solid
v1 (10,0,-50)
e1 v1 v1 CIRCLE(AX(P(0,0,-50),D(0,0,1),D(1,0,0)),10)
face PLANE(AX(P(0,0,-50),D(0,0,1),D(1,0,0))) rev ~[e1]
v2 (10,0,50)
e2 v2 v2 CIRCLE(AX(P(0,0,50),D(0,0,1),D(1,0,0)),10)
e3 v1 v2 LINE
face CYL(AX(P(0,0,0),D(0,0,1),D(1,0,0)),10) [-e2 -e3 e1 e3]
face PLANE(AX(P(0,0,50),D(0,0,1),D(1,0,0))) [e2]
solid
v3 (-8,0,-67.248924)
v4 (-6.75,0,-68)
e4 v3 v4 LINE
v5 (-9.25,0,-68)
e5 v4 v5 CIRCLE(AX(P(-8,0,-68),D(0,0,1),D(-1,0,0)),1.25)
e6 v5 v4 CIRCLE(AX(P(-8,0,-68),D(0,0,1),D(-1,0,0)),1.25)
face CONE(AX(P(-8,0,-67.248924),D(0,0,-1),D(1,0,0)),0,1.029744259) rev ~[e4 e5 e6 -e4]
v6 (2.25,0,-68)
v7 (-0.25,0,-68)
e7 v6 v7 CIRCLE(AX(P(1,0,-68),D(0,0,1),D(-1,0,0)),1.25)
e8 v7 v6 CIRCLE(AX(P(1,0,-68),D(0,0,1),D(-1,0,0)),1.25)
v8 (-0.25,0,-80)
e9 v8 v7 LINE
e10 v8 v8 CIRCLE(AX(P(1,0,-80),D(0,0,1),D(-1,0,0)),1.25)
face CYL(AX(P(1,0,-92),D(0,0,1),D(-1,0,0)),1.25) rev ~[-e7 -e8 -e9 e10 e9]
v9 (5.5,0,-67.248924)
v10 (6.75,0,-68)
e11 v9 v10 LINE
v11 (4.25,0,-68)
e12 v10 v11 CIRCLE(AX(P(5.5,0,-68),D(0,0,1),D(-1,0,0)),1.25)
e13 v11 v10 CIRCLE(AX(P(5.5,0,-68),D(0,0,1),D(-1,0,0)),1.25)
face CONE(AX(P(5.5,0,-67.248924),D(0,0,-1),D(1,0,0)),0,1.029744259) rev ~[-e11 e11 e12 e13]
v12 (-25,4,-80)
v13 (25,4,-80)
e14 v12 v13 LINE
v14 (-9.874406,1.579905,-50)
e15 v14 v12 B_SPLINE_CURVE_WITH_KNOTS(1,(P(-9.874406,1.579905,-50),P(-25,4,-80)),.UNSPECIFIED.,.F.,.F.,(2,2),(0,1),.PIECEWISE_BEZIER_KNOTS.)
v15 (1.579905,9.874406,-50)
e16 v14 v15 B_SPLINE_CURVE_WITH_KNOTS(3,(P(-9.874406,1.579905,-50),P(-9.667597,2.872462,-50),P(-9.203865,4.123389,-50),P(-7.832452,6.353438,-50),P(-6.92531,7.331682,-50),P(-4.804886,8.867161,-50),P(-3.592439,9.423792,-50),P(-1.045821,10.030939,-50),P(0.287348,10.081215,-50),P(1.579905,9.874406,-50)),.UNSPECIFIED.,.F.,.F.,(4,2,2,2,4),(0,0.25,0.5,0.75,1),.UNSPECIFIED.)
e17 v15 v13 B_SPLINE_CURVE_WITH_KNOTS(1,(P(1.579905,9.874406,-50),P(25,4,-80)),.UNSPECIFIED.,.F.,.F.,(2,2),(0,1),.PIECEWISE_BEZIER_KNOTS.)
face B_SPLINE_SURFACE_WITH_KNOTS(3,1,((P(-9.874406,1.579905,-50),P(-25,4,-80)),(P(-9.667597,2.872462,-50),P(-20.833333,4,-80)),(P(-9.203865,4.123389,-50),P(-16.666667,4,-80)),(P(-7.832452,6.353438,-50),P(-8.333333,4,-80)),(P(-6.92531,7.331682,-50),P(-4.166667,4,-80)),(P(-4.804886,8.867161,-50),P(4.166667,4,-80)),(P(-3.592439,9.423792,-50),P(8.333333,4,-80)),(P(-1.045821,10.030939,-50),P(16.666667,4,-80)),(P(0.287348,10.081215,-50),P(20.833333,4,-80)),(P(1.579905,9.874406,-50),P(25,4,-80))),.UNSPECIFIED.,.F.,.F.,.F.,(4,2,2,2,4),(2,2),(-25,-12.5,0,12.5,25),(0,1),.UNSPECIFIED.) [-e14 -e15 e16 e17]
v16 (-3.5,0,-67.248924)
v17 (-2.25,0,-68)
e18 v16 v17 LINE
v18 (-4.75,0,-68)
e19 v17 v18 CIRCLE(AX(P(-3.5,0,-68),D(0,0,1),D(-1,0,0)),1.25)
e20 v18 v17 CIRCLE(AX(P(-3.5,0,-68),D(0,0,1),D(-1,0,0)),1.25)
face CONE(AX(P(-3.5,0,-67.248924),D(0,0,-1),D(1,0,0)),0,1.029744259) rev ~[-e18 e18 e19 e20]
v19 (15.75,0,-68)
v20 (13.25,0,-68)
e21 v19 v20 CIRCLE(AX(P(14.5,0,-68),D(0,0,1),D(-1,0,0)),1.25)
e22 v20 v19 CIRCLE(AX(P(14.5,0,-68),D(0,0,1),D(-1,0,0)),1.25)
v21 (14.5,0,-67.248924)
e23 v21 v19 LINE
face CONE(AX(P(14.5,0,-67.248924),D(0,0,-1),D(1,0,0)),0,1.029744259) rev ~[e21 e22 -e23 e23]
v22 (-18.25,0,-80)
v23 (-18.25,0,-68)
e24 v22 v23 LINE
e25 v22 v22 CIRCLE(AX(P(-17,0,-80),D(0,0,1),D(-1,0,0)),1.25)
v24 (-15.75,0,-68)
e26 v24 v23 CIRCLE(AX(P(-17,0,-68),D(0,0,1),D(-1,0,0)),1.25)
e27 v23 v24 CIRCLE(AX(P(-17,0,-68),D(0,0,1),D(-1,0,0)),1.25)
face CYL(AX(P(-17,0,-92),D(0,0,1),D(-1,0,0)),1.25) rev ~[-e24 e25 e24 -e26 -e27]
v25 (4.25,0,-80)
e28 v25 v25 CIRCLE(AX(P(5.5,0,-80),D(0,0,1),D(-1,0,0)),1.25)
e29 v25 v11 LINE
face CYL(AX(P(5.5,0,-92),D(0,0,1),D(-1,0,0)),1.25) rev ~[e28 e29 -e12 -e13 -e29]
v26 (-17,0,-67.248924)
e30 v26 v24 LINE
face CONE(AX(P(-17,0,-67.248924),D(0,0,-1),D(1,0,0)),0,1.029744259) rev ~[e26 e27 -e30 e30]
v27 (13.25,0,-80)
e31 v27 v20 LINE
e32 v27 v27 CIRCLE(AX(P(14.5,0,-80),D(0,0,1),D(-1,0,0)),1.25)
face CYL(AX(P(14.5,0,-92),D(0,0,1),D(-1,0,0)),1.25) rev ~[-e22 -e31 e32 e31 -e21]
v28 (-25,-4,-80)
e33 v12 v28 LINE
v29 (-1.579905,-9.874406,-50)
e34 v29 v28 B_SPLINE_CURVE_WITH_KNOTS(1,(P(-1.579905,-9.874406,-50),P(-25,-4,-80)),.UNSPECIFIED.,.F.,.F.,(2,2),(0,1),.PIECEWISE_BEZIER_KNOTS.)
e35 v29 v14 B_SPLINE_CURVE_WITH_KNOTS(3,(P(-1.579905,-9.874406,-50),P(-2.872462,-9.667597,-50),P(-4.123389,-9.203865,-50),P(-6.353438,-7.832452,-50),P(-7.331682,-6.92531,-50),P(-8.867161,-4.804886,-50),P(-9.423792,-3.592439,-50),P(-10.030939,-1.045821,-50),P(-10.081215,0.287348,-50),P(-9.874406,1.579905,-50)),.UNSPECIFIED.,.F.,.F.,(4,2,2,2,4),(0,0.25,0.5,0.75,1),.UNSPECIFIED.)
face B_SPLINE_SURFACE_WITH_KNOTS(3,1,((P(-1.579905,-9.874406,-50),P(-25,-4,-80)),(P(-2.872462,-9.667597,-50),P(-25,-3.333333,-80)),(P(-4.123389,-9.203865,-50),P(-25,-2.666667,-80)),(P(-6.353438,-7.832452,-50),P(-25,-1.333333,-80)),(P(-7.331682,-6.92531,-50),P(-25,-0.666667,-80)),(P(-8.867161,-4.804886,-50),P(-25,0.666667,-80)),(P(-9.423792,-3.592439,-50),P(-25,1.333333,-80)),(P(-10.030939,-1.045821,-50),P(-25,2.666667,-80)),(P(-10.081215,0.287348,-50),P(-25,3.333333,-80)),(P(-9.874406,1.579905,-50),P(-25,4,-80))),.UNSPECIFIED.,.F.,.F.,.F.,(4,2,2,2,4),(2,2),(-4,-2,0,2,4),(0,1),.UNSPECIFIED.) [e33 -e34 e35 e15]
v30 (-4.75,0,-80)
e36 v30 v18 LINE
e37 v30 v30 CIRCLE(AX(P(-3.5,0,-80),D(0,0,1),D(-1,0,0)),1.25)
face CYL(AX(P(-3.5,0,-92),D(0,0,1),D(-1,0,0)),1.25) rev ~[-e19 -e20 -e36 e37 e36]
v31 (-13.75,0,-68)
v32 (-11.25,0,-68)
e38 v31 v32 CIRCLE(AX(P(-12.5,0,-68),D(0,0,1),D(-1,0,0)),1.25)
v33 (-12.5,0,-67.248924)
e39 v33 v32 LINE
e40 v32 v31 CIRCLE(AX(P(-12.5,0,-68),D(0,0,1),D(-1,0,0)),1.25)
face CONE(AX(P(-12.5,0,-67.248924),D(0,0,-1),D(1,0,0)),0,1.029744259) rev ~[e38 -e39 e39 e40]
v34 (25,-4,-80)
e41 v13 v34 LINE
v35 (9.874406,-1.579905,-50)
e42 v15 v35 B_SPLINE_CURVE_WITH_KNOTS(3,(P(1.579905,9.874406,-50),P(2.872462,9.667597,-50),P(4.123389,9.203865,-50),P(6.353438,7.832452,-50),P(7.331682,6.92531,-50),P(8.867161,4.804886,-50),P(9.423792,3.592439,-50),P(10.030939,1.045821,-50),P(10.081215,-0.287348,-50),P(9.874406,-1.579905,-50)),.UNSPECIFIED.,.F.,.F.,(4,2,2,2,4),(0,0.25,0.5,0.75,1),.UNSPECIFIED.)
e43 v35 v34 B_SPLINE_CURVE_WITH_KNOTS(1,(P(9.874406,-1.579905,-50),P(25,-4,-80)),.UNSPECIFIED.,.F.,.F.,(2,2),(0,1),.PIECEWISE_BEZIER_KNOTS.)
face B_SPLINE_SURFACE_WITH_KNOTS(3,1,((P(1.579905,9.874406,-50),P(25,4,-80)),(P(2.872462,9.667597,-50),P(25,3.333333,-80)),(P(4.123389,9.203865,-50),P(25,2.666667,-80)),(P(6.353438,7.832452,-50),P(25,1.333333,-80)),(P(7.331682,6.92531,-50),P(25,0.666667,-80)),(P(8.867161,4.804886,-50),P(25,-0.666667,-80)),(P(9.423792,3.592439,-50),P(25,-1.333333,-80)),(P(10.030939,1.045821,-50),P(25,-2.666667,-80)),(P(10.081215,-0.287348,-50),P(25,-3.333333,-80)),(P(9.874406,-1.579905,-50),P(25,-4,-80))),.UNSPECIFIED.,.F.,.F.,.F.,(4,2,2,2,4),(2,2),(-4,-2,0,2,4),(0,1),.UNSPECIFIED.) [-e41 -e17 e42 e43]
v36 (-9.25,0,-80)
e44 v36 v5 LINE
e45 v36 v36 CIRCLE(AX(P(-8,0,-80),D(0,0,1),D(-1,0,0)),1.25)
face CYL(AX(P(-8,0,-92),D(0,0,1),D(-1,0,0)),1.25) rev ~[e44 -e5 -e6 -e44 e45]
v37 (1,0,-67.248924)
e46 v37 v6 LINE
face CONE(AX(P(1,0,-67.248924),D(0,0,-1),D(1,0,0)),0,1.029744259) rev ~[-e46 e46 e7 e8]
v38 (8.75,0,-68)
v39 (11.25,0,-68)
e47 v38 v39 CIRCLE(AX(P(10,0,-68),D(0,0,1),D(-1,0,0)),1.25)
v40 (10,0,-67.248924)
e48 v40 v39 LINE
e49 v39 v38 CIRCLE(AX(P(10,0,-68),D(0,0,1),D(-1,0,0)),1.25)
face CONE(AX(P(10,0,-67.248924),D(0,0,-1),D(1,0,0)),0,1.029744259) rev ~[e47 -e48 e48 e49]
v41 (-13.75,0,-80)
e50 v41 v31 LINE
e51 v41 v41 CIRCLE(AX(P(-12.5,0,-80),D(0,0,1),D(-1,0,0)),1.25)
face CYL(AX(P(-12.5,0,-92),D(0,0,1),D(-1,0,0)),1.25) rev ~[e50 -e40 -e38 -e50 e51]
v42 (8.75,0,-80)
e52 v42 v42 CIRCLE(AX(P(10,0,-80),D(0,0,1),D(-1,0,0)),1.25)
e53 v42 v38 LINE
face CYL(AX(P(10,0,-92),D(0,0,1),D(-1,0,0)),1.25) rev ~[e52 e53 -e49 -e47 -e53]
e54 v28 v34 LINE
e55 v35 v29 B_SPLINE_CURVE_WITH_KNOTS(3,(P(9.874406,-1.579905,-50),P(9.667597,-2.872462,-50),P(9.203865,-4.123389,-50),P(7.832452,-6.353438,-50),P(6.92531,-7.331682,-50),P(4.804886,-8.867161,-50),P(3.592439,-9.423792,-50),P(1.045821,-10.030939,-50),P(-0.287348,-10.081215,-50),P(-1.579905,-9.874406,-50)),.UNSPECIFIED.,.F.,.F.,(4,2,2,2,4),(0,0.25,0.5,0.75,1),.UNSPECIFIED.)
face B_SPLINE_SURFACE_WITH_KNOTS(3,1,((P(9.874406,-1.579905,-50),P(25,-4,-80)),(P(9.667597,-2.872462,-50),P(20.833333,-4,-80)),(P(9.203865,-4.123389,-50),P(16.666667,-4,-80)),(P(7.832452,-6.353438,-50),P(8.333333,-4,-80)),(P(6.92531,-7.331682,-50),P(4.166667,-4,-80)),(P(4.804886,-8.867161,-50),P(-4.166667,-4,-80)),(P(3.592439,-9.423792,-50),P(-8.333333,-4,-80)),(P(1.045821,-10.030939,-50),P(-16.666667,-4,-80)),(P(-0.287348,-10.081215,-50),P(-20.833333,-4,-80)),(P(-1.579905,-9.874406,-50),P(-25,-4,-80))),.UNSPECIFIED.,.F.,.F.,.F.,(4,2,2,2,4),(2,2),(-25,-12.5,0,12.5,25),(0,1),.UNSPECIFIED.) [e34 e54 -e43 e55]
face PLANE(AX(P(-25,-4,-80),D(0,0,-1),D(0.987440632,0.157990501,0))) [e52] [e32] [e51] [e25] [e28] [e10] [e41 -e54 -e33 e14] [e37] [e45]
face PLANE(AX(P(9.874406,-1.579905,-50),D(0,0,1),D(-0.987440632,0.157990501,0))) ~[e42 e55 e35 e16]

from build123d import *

# Parameters (mm, degrees)
F0_R     = 10
F1_DEPTH = 50
F4_W     = 50
F4_H     = 8
F7_D     = 2.5
F7_DEPTH = 12
F7_TIP   = 0.7510757738


# Not quite as in the source:
# - the arcs of a loft's sections are written as splines that run evenly, so that the points pair up as in the source's solid
# - a feature names something its author has since deleted; it is built from what else it names


with BuildPart() as f1:
    # F0 (on Top) → F1 (new body, symmetric)
    with BuildSketch(Plane.XY):
        Circle(F0_R)
    extrude(amount=F1_DEPTH, both=True)


with BuildPart() as f5:
    # F2 (on face) → F5 section 0
    with BuildSketch(Plane(origin=(0, 0, -50), x_dir=(1, 0, 0), z_dir=(0, 0, -1))):
        with BuildLine():
            add(Edge.make_bspline(
                [(9.8744063192, 1.5799050111), (9.6675972368, 2.8724617757), (9.2038651591, 4.1233892759), (7.832451684, 6.3534379358), (6.9253098794, 7.3316816666), (4.8048863637, 8.8671607642), (3.5924389487, 9.4237919855), (1.0458206508, 10.0309387473), (-0.2873482464, 10.0812154015), (-1.5799050111, 9.8744063192)],
                knots=[0, 0, 0, 0, 0.25, 0.25, 0.5, 0.5, 0.75, 0.75, 1, 1, 1, 1], degree=3))
            add(Edge.make_bspline(
                [(-1.5799050111, 9.8744063192), (-2.8724617757, 9.6675972368), (-4.1233892759, 9.2038651591), (-6.3534379358, 7.832451684), (-7.3316816666, 6.9253098794), (-8.8671607642, 4.8048863637), (-9.4237919855, 3.5924389487), (-10.0309387473, 1.0458206508), (-10.0812154015, -0.2873482464), (-9.8744063192, -1.5799050111)],
                knots=[0, 0, 0, 0, 0.25, 0.25, 0.5, 0.5, 0.75, 0.75, 1, 1, 1, 1], degree=3))
            add(Edge.make_bspline(
                [(-9.8744063192, -1.5799050111), (-9.6675972368, -2.8724617757), (-9.2038651591, -4.1233892759), (-7.832451684, -6.3534379358), (-6.9253098794, -7.3316816666), (-4.8048863637, -8.8671607642), (-3.5924389487, -9.4237919855), (-1.0458206508, -10.0309387473), (0.2873482464, -10.0812154015), (1.5799050111, -9.8744063192)],
                knots=[0, 0, 0, 0, 0.25, 0.25, 0.5, 0.5, 0.75, 0.75, 1, 1, 1, 1], degree=3))
            add(Edge.make_bspline(
                [(1.5799050111, -9.8744063192), (2.8724617757, -9.6675972368), (4.1233892759, -9.2038651591), (6.3534379358, -7.832451684), (7.3316816666, -6.9253098794), (8.8671607642, -4.8048863637), (9.4237919855, -3.5924389487), (10.0309387473, -1.0458206508), (10.0812154015, 0.2873482464), (9.8744063192, 1.5799050111)],
                knots=[0, 0, 0, 0, 0.25, 0.25, 0.5, 0.5, 0.75, 0.75, 1, 1, 1, 1], degree=3))
        make_face()
    # F4 (on offset) → F5 section 1
    with BuildSketch(Plane(origin=(0, 0, -80), x_dir=(1, 0, 0), z_dir=(0, 0, -1))):
        Rectangle(F4_W, F4_H)
    loft(ruled=True)

    # F7
    with Locations(Plane(origin=(0, 0, -80), x_dir=(1, 0, 0), z_dir=(0, 0, -1))):
        with Locations((-17, 0), (-12.5, 0), (-8, 0), (-3.5, 0), (1, 0), (5.5, 0), (10, 0), (14.5, 0)):
            Hole(F7_D / 2, depth=F7_DEPTH)
            with Locations((0, 0, -(F7_DEPTH + F7_TIP / 2))):  # 118° drill point
                Cone(0, F7_D / 2, F7_TIP, mode=Mode.SUBTRACT)


solid = Compound([f1.part, f5.part])
